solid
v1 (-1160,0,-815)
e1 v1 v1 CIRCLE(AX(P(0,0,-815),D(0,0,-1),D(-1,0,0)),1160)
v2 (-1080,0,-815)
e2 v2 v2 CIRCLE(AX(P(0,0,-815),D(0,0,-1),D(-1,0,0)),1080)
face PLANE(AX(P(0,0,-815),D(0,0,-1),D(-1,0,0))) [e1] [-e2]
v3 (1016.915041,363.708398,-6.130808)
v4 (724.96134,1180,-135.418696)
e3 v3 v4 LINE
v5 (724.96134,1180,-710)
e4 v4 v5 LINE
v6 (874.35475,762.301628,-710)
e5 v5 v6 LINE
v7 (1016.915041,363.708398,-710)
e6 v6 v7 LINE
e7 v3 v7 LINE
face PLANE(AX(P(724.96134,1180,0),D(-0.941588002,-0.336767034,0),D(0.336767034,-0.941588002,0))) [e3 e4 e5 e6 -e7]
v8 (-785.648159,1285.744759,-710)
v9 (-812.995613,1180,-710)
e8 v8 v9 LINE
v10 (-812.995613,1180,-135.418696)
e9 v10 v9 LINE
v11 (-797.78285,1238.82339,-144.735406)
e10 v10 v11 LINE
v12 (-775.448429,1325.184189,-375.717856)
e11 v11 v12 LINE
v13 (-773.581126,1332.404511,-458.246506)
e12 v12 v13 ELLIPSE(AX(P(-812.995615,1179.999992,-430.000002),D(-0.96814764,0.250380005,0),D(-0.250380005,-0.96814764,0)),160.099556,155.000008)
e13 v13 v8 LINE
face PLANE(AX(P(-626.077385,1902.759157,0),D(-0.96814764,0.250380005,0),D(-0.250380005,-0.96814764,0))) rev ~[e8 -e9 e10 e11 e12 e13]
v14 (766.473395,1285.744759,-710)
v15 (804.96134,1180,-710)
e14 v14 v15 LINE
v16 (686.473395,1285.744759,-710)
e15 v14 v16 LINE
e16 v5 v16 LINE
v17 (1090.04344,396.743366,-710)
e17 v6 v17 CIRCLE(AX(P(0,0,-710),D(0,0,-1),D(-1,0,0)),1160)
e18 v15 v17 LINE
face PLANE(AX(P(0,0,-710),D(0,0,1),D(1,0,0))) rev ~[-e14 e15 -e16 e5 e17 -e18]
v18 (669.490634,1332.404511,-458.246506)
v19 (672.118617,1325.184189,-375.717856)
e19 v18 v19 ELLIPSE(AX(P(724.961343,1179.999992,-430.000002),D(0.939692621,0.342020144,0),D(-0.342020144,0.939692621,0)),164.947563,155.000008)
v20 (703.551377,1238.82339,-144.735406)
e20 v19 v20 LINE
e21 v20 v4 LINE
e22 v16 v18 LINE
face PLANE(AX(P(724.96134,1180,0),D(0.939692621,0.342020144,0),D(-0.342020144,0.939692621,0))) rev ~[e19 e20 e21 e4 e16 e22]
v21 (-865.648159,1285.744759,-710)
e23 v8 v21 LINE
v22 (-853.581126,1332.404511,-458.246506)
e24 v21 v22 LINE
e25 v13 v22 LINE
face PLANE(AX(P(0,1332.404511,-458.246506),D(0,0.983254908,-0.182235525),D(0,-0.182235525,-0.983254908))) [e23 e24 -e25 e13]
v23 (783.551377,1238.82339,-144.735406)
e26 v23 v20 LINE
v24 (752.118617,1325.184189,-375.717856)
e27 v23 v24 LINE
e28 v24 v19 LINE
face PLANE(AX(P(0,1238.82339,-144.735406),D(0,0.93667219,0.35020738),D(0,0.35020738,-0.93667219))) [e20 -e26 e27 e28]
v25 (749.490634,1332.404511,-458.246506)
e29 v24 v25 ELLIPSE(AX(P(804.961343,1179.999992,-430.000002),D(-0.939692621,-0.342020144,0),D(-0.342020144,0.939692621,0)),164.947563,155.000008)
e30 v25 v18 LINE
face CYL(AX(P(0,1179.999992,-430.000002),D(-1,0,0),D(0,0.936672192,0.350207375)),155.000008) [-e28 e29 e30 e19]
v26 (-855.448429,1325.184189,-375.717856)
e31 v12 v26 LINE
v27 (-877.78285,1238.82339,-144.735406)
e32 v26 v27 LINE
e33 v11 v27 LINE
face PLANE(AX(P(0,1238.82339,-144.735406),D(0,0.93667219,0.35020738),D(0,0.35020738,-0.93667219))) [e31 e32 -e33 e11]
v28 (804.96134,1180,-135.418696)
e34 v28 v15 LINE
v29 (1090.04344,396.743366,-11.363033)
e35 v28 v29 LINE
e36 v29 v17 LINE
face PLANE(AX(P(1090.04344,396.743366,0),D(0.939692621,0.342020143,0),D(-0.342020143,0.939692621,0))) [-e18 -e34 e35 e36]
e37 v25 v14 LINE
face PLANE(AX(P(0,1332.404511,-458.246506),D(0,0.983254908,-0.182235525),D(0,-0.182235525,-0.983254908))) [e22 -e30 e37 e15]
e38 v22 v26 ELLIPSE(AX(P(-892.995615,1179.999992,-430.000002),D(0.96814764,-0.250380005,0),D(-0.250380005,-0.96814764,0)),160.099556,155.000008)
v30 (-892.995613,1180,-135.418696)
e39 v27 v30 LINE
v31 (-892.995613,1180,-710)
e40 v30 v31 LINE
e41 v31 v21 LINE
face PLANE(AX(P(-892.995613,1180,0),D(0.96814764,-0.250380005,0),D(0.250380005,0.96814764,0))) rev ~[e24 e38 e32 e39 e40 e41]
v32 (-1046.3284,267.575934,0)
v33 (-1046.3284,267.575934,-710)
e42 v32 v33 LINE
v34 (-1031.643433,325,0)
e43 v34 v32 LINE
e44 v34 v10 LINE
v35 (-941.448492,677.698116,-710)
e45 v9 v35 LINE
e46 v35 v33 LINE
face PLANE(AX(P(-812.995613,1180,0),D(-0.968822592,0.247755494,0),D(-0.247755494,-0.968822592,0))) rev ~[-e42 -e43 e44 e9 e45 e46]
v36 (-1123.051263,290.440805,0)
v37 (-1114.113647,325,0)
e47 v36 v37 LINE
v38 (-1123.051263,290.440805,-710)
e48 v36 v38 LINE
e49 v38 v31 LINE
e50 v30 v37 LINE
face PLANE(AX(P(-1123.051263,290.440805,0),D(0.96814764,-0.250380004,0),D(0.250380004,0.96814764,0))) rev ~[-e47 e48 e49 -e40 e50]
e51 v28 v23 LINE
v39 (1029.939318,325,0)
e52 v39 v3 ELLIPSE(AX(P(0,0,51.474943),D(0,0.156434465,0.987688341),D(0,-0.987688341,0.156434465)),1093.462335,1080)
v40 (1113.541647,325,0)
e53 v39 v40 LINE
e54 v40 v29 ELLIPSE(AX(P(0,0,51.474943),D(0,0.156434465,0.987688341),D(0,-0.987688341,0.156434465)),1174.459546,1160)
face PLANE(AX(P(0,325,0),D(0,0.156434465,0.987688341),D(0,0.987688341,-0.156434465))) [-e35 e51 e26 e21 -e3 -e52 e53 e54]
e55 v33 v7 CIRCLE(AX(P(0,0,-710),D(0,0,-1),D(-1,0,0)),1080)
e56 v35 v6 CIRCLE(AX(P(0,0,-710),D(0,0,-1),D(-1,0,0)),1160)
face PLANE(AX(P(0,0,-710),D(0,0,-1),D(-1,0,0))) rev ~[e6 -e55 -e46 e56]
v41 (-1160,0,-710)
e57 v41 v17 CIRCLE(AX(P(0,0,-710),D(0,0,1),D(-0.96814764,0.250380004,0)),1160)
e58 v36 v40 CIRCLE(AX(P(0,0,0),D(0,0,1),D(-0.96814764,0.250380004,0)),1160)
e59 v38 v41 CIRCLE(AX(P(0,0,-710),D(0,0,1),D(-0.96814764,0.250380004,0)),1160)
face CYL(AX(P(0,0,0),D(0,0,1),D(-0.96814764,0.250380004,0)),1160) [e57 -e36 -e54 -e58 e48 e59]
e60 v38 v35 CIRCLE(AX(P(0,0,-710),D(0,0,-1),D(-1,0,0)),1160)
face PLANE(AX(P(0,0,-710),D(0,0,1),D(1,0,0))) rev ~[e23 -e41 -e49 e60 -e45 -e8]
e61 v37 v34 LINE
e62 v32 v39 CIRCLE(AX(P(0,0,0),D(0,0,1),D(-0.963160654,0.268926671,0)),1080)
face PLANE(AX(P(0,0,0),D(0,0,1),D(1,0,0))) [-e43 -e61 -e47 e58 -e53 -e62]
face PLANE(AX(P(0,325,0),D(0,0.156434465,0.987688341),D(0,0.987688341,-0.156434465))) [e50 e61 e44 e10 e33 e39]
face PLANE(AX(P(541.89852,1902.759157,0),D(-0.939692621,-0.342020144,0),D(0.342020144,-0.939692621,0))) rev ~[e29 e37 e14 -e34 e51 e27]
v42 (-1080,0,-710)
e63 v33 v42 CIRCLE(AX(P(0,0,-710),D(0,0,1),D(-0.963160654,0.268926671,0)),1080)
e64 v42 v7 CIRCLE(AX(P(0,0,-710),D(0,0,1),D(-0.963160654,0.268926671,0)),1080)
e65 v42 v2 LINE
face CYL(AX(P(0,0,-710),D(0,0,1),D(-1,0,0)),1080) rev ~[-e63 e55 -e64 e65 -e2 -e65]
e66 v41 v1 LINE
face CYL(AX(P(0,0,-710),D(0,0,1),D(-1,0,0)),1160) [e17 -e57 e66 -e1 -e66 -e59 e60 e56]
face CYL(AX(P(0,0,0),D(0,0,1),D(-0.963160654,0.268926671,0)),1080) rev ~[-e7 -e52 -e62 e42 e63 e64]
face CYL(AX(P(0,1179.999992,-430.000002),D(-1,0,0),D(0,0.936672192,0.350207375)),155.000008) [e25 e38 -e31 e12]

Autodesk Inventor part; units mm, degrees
ref_plane "YZ Plane" through (0, 0, 0) normal (1, 0, 0) x (0, 1, 0)
ref_plane "XZ Plane" through (0, 0, 0) normal (0, 1, 0) x (-1, 0, 0)
ref_plane "XY Plane" through (0, 0, 0) normal (0, 0, 1) x (1, 0, 0)
sketch "Sketch1" plane through (0, 0, 0) normal (0, 0, 1) x (1, 0, 0)
  arc A0 (-1040.213506, 290.440805) -> (1016.915041, 363.708398) centre (0, 0) ccw
  arc A1 (-1123.051263, 290.440805) -> (1090.04344, 396.743366) centre (0, 0) ccw
  line L0 (-1123.051263, 290.440805) -> (-892.995613, 1180)
  line L1 (-1123.051263, 290.440805) -> (-204.225292, 290.440805) construction
  line L2 (1090.04344, 396.743366) -> (804.96134, 1180)
  line L3 (1090.04344, 396.743366) -> (1923.56774, 396.743366) construction
  line L4 (0, 0) -> (0, 1180) construction
  line L5 (0, 1180) -> (1900.808505, 1180) construction
  line L6 (1900.808505, 1180) -> (-2124.970927, 1180) construction
  line L7 (804.96134, 1180) -> (724.96134, 1180) construction
  line L8 (804.96134, 1180) -> (724.96134, 1180)
  line L9 (724.96134, 1180) -> (1016.915041, 363.708398)
  line L10 (-892.995613, 1180) -> (-812.995613, 1180)
  line L11 (-812.995613, 1180) -> (-1046.3284, 267.575934)
  line L12 (-892.995613, 1180) -> (-706.077385, 1902.759157)
  line L13 (-706.077385, 1902.759157) -> (-626.077385, 1902.759157)
  line L14 (-626.077385, 1902.759157) -> (-812.995613, 1180)
  line L15 (724.96134, 1180) -> (461.89852, 1902.759157)
  line L16 (461.89852, 1902.759157) -> (541.89852, 1902.759157)
  line L17 (541.89852, 1902.759157) -> (804.96134, 1180)
  dimension "d1" = 2160
  dimension "d2" = 2320
  dimension "d4" = 80
  dimension "d5" = 75.5
  dimension "d6" = 110
  dimension "d7" = 1180
  dimension "d8" = 80
  dimension "d9" = 80
extrude "Extrusion1" add sketch "Sketch1" against normal blind 710
ref_plane "Work Plane1" through (0, 0, 0) normal (1, 0, 0) x (0, 1, 0)
sketch "Sketch2" plane through (0, 0, 0) normal (1, 0, 0) x (0, 1, 0)
  line L0 (0, 0) -> (325, 0) construction
  line L1 (396.743366, 0) -> (-1160, 0) construction
  line L2 (325, 0) -> (325, -710) construction
  line L3 (-1160, -710) -> (396.743366, -710) construction
  line L4 (325, 0) -> (2190.73627, -295.503595)
  line L5 (325, 0) -> (2213.992907, 0) construction
  line L6 (2190.73627, -295.503595) -> (2190.73627, 0)
  line L7 (1902.759157, 0) -> (1902.759157, -710)
  line L8 (2190.73627, 0) -> (325, 0)
  line L9 (0, -815) -> (0, -430) construction
  line L10 (0, -430) -> (1180, -430) construction
  line L11 (1180, -430) -> (2009.151875, -357.458611) construction
  line L12 (1180, -430) -> (1334.410178, -416.49086) construction
  arc A0 (1180, -416.49086) -> (1180, -430) centre (1257.205089, -423.24543) ccw
  line L13 (1334.410178, -416.49086) -> (1425.077731, -416.49086) construction
  circle A1 centre (1180, -430) radius 155
  line L14 (1325.184189, -375.717856) -> (1238.82339, -144.735406)
  line L15 (1325.184189, -375.717856) -> (1634.970705, -375.717856) construction
  line L16 (1332.404511, -458.246506) -> (1285.744759, -710)
  line L17 (1332.404511, -458.246506) -> (1864.039818, -458.246506) construction
  line L18 (0, -815) -> (0, -710) construction
  line L19 (0, -710) -> (1902.759157, -710) construction
  line L20 (1285.744759, -710) -> (685.744759, -710)
  line L21 (685.744759, -710) -> (685.744759, -815)
  line L22 (685.744759, -815) -> (0, -815)
  line L23 (685.744759, -815) -> (1902.759157, -815)
  point P0 (290.440805, 0)
  point P1 (396.743366, -710)
  point P2 (290.440805, -710)
  point P3 (1902.759157, -249.892501)
  dimension "d13" = 325
  dimension "d14" = 9
  dimension "d17" = 385
  dimension "d18" = 1180
  dimension "d19" = 175
  dimension "d20" = 155
  dimension "d22" = 110.5
  dimension "d23" = 100.5
  dimension "d24" = 105
  dimension "d25" = 600
sketch "Sketch2 outline for Extrusion2" plane through (0, 0, 0) normal (1, 0, 0) x (0, 1, 0)
  line L0 (2190.73627, -295.503595) -> (2190.73627, 0)
  line L1 (2190.73627, 0) -> (325, 0)
  line L2 (325, 0) -> (1238.82339, -144.735406)
  line L3 (1238.82339, -144.735406) -> (1325.184189, -375.717856)
  arc A0 (1325.184189, -375.717856) -> (1332.404511, -458.246506) centre (1180, -430) cw
  line L4 (1332.404511, -458.246506) -> (1285.744759, -710)
  line L5 (1285.744759, -710) -> (685.744759, -710)
  line L6 (685.744759, -710) -> (685.744759, -815)
  line L7 (685.744759, -815) -> (1902.759157, -710)
  line L8 (1902.759157, -710) -> (1902.759157, -249.892501)
  line L9 (1902.759157, -249.892501) -> (2190.73627, -295.503595)
extrude "Extrusion2" cut sketch "Sketch2 outline for Extrusion2" along normal through all both and the other way through all
sketch "Sketch5" plane through (0, 0, -710) normal (0, 0, -1) x (-1, 0, 0)
  circle A0 centre (0, 0) radius 1080
  circle A1 centre (0, 0) radius 1160
extrude "Extrusion3" add sketch "Sketch5" along normal blind 105
